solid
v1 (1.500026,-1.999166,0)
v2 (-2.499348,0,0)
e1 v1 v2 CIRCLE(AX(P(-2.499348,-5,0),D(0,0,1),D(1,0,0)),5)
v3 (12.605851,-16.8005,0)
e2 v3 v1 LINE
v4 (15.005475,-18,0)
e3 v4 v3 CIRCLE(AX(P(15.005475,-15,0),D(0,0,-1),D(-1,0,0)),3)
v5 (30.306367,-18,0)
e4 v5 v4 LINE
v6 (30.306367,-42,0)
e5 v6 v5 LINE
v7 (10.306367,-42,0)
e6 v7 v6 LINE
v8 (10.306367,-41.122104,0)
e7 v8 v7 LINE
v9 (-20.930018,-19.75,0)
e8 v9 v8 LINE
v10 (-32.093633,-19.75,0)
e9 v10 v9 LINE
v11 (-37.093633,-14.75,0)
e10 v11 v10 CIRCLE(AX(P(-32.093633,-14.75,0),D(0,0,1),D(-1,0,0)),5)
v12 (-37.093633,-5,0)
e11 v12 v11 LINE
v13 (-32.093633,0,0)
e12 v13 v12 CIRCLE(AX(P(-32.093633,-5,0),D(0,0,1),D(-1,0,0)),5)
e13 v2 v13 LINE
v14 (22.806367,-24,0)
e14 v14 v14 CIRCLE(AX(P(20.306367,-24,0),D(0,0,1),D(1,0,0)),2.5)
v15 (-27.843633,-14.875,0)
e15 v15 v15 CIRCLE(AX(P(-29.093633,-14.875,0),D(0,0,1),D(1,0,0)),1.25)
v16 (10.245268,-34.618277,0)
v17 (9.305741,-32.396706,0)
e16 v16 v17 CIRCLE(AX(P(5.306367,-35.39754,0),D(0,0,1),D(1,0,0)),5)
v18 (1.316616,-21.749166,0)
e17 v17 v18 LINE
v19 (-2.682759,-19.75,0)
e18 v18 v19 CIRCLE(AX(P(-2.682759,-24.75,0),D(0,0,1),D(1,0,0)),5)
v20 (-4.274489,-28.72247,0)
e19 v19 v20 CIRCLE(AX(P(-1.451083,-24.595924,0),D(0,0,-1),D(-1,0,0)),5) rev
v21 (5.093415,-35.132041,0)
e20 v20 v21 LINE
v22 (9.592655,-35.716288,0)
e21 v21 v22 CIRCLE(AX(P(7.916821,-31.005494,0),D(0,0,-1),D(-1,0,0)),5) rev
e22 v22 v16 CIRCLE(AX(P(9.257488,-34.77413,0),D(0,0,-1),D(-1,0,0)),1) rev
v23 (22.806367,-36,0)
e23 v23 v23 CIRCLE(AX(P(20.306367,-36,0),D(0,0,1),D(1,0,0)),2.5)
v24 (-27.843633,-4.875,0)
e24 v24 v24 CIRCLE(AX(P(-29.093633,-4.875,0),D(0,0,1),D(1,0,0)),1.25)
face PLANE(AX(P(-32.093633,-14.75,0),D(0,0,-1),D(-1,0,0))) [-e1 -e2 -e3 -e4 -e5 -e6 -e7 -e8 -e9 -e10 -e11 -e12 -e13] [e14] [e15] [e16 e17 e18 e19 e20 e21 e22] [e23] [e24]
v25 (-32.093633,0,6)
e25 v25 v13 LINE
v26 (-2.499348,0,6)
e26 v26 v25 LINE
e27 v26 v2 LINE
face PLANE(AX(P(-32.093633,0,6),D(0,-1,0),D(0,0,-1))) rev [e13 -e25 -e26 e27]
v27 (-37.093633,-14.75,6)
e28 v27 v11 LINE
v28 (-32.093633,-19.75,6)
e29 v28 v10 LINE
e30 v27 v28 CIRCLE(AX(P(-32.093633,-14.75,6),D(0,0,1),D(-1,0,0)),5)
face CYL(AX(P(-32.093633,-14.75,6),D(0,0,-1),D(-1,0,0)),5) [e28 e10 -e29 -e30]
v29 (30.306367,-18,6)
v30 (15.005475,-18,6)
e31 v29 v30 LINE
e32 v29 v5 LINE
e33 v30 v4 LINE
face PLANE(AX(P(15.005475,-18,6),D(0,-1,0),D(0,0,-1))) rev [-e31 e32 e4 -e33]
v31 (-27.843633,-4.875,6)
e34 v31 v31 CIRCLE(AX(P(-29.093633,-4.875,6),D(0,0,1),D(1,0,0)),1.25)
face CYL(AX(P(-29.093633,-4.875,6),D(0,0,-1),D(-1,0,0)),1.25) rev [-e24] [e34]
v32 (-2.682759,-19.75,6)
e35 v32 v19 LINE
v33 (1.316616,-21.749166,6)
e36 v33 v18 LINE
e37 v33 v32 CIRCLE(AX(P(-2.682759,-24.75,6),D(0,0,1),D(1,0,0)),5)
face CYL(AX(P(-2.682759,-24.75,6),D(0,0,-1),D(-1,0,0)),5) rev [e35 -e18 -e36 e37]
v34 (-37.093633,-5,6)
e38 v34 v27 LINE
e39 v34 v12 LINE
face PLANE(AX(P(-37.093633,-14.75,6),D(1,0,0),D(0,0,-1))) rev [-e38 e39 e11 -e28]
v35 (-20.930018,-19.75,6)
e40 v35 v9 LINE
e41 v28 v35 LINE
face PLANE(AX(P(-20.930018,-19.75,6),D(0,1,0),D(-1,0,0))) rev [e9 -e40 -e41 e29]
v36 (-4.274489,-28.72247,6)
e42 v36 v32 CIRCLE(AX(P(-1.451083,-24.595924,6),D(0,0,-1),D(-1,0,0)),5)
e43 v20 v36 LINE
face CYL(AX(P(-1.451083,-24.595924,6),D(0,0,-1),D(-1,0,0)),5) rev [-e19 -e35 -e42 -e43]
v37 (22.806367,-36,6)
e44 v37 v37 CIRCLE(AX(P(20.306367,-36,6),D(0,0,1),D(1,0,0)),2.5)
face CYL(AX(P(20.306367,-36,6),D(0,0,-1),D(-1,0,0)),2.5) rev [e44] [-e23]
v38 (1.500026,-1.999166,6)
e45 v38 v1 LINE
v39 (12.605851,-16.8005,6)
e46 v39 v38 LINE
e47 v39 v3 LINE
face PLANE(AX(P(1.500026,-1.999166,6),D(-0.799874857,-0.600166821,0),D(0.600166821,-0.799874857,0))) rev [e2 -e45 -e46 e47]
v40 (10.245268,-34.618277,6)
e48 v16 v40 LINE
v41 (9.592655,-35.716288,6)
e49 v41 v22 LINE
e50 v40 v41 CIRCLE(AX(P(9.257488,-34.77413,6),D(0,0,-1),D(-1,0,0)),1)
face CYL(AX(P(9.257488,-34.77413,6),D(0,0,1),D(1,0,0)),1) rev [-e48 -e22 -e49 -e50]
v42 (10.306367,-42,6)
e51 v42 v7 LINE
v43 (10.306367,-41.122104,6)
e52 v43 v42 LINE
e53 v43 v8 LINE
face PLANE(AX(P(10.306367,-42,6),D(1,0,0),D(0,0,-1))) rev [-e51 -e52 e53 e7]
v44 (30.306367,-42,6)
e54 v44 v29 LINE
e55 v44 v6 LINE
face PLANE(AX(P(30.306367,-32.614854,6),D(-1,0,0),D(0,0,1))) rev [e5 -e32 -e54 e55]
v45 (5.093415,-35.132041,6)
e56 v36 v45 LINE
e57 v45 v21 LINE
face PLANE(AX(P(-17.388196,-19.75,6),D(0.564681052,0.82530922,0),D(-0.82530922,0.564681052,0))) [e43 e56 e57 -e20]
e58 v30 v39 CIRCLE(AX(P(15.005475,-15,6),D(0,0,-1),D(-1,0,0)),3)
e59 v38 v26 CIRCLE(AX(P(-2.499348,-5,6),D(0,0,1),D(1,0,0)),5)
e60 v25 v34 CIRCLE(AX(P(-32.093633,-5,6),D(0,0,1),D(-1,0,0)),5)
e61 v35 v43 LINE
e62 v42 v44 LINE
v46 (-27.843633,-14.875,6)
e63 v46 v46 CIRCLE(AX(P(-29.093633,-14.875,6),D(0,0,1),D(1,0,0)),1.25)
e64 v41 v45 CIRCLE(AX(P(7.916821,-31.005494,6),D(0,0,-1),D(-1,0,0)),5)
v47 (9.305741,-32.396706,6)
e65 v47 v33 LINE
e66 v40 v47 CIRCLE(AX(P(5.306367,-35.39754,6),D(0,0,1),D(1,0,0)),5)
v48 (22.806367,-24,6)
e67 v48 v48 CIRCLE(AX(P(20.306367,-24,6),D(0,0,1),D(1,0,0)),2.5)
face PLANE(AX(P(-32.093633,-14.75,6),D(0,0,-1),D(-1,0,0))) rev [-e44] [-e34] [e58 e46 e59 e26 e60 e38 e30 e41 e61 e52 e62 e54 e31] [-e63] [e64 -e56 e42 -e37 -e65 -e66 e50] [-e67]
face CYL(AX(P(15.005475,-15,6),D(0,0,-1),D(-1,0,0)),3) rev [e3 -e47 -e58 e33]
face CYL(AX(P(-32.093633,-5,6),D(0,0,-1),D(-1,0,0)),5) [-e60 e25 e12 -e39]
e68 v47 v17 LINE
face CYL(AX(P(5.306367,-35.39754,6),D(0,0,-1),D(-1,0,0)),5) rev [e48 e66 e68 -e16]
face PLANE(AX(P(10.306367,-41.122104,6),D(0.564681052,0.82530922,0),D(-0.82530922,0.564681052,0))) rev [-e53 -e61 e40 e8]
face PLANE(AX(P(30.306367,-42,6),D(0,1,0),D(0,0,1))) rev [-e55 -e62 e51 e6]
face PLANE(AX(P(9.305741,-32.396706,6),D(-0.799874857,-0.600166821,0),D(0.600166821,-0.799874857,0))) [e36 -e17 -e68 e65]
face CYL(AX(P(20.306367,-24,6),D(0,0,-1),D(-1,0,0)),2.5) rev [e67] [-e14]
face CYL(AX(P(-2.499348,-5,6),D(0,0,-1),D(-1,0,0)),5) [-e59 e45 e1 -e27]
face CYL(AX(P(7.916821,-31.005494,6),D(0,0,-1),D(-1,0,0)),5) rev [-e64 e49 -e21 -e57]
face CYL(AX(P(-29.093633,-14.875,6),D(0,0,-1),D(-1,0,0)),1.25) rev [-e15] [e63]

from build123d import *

# Parameters (mm, degrees)
SKETCH_1_R      = 2.5
SKETCH_1_R_2    = 1.25
EXTRUDE_1_DEPTH = 6
FILLET_1_R      = 5
FILLET_2_R      = 1


with BuildPart() as part:
    # 草图1 → 凸台-拉伸1 (new body)
    with BuildSketch(Plane.XY):
        with BuildLine():
            Line((1.500025947, -1.999165895), (12.605850611, -16.800500463))
            ThreePointArc((12.605850611, -16.800500463), (13.664114192, -17.683421453), (15.005475182, -18))
            Line((15.005475182, -18), (30.306366751, -18))
            Line((30.306366751, -18), (30.306366751, -32.6148543))
            Line((30.306366751, -32.6148543), (30.306366751, -42))
            Line((30.306366751, -42), (10.306366751, -42))
            Line((10.306366751, -42), (10.306366751, -41.12210437))
            Line((10.306366751, -41.12210437), (-20.930018343, -19.75))
            Line((-20.930018343, -19.75), (-32.093633249, -19.75))
            ThreePointArc((-32.093633249, -19.75), (-35.629167155, -18.285533906), (-37.093633249, -14.75))
            Line((-37.093633249, -14.75), (-37.093633249, -5))
            ThreePointArc((-37.093633249, -5), (-35.629167155, -1.464466094), (-32.093633249, 0))
            Line((-32.093633249, 0), (-2.499348338, 0))
            ThreePointArc((-2.499348338, 0), (-0.263746688, -0.527630912), (1.500025947, -1.999165895))
        make_face()
        with Locations((20.306366751, -36)):
            Circle(SKETCH_1_R, mode=Mode.SUBTRACT)
        with Locations((20.306366751, -24)):
            Circle(SKETCH_1_R, mode=Mode.SUBTRACT)
        with Locations((-29.093633249, -4.875)):
            Circle(SKETCH_1_R_2, mode=Mode.SUBTRACT)
        with Locations((-29.093633249, -14.875)):
            Circle(SKETCH_1_R_2, mode=Mode.SUBTRACT)
        with BuildLine():
            Line((9.305741036, -32.39670638), (1.316615651, -21.749165895))
            ThreePointArc((1.316615651, -21.749165895), (-0.447156984, -20.277630912), (-2.682758634, -19.75))
            Line((-2.682758634, -19.75), (-17.388195941, -19.75))
            Line((-17.388195941, -19.75), (10.306366751, -38.698770243))
            Line((10.306366751, -38.698770243), (10.306366751, -35.397540485))
            ThreePointArc((10.306366751, -35.397540485), (10.049618348, -33.815907061), (9.305741036, -32.39670638))
        make_face(mode=Mode.SUBTRACT)
    extrude(amount=EXTRUDE_1_DEPTH)

    # 圆角1
    # the kernel refuses this fillet: 5 mm, written as the material it adds along each edge
    with BuildSketch(Plane(origin=(10.306366751, -38.698770243, 0), x_dir=(0, 1, 0), z_dir=(0, 0, 1))) as fillet_1_piece_1:
        with BuildLine():
            CenterArc((7.693275838, 2.389546239), FILLET_1_R, 145.619854071, 62.929086432)
            Line((3.566729735, 5.2129515), (3.484198813, 5.269419605))
            Line((3.484198813, 5.269419605), (-0.082530922, 0.056468105))
            Line((-0.082530922, 0.056468105), (0, -0.1))
            ThreePointArc((0, -0.1), (1.650614879, -0.1), (3.213388836, -0.047790925))
            Line((3.213388836, -0.047790925), (3.301229757, 0))
        make_face()
    extrude(amount=6)
    with BuildSketch(Plane(origin=(-17.388195941, -19.75, 0), x_dir=(0.8253092204879542, -0.5646810520794596, 0), z_dir=(0, 0, 1))) as fillet_1_piece_2:
        with BuildLine():
            CenterArc((15.8894472, 5), FILLET_1_R, 138.640890522, 131.359109478)
            Line((12.136533001, 8.30388181), (12.061474717, 8.369959446))
            ThreePointArc((12.061474717, 8.369959446), (6.011798395, 4.234471827), (-0.056468105, 0.082530922))
            Line((-0.056468105, 0.082530922), (0, -0.1))
            Line((0, -0.1), (15.8894472, -0.1))
            Line((15.8894472, -0.1), (15.8894472, 0))
        make_face()
    extrude(amount=6)

    # 圆角2
    fillet_2_edges = [part.edges().sort_by_distance(p)[0] for p in [
        (10.306366751, -35.397540485, 3),
    ]]
    fillet(fillet_2_edges, radius=FILLET_2_R)


solid = part.part
